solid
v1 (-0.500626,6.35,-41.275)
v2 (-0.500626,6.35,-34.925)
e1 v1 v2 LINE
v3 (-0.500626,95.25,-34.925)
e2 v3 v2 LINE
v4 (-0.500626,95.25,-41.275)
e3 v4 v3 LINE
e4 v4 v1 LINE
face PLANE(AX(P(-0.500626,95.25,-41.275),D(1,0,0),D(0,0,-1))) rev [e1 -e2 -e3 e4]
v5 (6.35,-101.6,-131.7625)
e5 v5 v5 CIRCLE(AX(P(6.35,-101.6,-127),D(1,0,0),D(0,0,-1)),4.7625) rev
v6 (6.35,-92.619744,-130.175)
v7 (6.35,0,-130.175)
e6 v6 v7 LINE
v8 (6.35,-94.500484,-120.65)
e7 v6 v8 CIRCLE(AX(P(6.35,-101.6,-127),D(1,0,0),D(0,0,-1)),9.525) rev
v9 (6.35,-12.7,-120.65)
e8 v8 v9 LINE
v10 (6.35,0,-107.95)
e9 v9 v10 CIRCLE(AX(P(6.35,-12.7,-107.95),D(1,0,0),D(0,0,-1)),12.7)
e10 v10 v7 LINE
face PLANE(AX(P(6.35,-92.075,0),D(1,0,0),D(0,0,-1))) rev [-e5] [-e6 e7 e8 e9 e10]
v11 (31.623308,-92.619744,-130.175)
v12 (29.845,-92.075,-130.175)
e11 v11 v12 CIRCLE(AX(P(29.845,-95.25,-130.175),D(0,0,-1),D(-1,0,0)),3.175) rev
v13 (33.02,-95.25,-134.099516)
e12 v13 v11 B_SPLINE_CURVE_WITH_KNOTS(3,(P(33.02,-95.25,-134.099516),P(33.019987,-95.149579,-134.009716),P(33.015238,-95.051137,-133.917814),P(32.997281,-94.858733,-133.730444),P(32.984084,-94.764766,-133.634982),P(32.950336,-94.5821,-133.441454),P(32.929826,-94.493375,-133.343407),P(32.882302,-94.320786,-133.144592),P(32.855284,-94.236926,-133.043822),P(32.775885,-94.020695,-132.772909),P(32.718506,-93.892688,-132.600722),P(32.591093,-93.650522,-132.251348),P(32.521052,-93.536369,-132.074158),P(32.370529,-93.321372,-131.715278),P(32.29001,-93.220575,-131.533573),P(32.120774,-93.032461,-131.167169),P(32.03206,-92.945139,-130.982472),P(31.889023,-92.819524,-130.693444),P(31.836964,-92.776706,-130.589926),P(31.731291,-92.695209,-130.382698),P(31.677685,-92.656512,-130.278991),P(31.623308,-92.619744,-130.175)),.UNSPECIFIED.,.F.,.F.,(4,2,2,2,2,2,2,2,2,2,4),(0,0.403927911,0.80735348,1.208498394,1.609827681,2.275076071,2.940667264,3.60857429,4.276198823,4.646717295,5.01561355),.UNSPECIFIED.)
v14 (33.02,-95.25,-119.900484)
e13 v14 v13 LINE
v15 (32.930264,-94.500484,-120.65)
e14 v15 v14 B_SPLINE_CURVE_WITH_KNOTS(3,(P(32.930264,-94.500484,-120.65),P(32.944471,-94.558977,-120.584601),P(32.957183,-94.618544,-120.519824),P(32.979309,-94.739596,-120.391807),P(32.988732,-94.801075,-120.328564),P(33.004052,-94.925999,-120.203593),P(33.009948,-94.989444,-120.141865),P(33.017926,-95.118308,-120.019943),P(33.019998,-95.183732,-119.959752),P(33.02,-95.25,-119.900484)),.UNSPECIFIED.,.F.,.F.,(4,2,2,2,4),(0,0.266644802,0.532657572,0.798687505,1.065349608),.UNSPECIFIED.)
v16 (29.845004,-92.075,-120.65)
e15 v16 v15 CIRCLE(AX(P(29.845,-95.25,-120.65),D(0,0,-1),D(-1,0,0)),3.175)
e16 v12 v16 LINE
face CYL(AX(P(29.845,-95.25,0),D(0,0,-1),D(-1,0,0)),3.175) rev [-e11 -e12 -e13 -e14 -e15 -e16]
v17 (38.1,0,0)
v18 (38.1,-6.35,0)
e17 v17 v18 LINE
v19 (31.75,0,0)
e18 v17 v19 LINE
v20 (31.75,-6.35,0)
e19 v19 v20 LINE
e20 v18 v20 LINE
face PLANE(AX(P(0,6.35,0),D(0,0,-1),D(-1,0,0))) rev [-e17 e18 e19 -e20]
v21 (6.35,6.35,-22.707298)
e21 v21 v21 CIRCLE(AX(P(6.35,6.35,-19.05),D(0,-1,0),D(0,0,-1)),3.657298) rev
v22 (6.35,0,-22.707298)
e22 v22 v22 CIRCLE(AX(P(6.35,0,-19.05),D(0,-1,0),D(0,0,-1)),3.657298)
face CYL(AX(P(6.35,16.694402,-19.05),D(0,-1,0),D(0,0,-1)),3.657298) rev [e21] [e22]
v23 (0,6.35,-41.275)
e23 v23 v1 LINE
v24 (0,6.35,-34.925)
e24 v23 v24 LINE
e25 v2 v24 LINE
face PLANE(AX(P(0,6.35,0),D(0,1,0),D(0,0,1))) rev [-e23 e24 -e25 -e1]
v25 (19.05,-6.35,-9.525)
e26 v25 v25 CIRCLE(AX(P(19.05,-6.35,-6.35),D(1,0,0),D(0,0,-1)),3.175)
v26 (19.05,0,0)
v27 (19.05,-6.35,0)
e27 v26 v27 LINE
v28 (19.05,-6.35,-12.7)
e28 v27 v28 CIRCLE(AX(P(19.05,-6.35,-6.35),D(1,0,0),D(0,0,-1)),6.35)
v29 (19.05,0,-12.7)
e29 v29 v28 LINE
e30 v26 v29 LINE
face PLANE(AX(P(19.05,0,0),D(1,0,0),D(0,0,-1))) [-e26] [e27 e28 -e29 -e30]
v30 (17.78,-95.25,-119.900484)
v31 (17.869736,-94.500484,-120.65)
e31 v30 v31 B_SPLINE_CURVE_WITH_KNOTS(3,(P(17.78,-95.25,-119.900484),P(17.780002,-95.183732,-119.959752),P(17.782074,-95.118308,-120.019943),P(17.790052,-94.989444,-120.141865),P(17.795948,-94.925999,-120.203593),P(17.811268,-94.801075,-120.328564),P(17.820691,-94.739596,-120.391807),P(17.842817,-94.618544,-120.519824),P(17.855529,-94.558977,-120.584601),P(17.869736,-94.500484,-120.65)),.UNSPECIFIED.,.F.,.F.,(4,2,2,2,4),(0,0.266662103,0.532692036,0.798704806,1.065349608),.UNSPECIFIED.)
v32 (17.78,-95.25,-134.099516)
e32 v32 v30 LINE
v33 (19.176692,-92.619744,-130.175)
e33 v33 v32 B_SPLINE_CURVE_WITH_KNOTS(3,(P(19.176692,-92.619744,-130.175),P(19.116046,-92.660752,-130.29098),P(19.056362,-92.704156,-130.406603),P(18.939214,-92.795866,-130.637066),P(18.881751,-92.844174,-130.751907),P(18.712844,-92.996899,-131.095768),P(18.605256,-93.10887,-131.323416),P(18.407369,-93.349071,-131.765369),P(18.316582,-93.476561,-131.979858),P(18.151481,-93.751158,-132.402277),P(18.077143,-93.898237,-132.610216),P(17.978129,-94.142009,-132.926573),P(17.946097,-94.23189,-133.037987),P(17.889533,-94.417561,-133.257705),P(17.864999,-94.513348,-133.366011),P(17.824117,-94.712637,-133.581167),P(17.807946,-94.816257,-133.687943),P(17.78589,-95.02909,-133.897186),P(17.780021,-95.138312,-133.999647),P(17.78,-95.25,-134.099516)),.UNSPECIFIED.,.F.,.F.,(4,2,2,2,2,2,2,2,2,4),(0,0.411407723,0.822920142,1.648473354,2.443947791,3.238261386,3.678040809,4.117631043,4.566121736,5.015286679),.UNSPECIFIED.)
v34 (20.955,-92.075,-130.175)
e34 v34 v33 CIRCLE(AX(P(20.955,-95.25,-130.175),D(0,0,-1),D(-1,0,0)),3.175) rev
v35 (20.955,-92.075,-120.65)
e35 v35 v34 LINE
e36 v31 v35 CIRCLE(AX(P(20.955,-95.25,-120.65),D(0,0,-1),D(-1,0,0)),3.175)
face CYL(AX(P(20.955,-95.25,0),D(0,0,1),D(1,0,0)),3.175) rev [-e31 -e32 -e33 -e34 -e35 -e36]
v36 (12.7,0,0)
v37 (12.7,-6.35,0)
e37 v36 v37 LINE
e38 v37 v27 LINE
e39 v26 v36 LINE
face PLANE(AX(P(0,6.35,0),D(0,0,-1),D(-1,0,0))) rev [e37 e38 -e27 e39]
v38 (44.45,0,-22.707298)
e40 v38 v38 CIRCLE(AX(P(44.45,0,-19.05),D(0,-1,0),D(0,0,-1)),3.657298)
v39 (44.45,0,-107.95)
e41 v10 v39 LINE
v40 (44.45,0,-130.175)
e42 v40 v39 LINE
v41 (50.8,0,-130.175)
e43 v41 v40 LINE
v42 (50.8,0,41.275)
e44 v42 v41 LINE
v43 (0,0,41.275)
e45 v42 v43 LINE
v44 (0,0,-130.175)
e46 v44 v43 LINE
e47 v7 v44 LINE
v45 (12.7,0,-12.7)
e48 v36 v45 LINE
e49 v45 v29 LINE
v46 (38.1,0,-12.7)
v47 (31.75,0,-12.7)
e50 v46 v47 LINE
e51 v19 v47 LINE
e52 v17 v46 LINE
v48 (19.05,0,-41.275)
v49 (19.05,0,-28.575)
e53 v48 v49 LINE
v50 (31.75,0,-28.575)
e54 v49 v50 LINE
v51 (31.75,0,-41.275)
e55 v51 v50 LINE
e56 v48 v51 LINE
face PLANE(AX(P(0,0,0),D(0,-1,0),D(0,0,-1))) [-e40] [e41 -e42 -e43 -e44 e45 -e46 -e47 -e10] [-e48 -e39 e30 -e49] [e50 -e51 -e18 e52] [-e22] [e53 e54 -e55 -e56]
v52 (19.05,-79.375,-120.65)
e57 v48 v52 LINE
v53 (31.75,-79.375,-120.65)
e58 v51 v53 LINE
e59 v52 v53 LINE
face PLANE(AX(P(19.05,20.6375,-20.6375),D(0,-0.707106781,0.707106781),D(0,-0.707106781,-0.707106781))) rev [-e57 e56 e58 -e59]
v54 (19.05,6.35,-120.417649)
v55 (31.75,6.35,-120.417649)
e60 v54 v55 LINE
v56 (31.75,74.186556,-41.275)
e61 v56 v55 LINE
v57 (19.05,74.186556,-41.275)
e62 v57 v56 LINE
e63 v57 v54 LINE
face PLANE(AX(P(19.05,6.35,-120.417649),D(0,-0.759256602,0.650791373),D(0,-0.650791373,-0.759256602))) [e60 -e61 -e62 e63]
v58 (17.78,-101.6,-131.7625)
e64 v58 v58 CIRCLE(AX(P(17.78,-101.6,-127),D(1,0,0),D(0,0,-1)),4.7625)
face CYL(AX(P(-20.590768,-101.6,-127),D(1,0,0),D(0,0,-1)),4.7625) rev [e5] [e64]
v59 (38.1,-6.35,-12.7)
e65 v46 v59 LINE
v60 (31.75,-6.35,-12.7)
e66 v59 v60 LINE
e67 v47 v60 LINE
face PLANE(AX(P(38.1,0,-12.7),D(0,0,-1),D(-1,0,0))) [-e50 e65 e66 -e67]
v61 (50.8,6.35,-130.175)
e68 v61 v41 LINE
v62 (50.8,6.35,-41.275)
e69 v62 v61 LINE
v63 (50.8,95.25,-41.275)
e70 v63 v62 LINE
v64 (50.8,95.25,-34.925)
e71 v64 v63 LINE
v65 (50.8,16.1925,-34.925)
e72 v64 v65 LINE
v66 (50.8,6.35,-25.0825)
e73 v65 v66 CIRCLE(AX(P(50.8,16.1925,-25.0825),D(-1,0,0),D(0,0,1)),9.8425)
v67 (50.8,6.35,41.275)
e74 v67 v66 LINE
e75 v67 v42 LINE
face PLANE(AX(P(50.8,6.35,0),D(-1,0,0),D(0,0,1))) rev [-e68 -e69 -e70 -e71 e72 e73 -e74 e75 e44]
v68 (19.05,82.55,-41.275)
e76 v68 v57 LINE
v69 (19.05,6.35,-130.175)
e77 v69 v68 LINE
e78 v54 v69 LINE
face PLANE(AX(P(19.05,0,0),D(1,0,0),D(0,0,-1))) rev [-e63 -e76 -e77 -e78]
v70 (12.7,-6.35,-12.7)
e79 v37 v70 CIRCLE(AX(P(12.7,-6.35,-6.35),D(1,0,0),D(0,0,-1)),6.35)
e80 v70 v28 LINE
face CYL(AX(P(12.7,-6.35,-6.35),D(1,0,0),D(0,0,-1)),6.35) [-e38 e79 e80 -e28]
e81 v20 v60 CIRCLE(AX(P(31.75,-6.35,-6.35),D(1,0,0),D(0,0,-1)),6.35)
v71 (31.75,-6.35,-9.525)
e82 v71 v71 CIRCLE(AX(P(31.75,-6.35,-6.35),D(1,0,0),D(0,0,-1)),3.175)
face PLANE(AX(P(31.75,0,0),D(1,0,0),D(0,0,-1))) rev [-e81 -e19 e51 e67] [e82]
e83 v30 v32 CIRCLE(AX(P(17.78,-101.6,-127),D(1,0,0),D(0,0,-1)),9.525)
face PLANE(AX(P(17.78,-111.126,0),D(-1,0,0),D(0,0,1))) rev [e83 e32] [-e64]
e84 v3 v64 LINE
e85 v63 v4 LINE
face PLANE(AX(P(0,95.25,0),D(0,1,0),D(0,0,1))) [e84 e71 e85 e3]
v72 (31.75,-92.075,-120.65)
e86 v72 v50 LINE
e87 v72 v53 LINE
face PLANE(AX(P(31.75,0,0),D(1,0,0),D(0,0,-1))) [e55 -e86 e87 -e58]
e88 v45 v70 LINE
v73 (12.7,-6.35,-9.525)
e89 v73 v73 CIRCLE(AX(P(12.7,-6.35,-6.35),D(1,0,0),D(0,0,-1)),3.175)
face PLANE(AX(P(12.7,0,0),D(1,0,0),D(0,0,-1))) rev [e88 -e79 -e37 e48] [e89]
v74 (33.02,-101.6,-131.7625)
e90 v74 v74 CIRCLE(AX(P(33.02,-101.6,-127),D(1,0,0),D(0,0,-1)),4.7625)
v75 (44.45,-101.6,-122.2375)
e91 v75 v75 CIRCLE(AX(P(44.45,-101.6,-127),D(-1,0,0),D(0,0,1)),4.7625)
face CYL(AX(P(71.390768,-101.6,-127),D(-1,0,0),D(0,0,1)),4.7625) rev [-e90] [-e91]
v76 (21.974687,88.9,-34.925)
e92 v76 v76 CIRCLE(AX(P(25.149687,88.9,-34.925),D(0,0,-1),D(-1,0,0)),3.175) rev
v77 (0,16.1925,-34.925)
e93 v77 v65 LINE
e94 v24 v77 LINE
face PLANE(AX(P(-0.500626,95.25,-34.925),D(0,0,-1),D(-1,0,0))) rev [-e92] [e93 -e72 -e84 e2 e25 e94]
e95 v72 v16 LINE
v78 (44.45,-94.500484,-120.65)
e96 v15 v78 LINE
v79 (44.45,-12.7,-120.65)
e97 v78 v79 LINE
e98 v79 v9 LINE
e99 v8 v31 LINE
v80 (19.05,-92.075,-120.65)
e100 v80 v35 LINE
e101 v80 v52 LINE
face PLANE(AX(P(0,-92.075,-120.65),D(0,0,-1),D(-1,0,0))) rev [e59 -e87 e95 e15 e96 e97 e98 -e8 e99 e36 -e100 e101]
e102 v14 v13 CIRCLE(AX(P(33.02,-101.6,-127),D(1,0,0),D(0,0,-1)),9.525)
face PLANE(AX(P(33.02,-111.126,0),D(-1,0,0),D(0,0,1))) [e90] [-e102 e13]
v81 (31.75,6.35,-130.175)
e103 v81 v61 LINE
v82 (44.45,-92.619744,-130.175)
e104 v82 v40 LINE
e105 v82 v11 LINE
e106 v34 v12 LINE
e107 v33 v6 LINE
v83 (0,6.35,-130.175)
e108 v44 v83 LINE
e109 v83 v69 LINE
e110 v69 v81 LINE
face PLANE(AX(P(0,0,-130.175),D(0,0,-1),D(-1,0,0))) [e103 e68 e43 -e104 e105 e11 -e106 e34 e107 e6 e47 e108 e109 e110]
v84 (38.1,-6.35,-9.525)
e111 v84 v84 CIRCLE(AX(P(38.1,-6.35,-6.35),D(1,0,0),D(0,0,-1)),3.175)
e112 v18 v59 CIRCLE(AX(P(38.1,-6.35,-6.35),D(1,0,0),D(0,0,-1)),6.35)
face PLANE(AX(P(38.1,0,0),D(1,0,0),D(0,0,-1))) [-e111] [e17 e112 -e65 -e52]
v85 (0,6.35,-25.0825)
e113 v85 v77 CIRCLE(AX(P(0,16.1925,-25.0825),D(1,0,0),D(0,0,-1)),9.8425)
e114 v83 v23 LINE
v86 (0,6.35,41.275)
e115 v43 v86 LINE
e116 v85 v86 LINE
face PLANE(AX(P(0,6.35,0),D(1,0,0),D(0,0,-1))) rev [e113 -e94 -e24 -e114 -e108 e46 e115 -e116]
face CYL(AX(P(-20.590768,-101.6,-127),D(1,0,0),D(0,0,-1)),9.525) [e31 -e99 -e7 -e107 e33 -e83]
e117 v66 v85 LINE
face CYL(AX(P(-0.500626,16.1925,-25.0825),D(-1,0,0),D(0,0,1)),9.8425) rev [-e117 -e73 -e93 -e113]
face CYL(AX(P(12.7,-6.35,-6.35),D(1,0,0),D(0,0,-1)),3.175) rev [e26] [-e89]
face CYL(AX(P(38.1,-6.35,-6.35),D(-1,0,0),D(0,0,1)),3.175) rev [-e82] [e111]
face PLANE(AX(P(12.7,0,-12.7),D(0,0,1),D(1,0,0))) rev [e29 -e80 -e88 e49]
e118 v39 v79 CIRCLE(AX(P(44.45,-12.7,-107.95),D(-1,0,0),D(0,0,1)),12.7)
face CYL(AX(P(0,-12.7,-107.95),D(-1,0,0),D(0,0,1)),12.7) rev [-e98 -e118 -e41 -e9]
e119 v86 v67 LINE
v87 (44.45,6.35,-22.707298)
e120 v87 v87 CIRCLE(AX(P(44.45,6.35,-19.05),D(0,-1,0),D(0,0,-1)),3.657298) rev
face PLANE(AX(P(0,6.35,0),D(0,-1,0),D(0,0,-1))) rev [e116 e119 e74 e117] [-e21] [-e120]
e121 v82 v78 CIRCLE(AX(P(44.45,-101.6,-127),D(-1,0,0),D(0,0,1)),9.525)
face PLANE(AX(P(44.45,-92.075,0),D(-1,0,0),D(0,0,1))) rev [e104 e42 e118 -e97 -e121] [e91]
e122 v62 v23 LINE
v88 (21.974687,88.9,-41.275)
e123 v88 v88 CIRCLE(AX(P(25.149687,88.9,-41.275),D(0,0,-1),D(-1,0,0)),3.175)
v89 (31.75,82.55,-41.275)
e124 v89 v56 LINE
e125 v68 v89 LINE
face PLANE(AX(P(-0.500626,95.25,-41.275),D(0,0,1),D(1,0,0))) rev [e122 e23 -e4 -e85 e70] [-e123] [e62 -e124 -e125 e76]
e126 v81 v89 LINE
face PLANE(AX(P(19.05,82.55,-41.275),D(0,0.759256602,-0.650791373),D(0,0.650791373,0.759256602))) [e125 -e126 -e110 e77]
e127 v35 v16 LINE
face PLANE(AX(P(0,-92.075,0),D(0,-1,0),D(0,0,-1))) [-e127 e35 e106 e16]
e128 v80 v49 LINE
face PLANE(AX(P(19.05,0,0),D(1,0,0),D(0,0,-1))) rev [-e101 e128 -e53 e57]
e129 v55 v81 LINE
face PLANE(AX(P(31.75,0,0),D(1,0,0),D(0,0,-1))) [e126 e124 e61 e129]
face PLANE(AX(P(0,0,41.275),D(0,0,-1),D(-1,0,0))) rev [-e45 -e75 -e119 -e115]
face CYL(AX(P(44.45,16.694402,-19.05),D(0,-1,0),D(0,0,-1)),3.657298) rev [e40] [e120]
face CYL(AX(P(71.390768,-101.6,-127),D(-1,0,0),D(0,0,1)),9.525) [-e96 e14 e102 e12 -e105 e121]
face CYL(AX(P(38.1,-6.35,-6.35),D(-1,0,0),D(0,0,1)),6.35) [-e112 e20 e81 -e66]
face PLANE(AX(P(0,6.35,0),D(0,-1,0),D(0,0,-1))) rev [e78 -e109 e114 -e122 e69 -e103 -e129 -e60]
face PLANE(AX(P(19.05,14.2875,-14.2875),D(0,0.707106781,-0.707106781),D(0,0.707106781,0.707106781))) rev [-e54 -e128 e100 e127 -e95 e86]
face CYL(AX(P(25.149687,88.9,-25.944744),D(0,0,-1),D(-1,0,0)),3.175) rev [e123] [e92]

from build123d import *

# Parameters (mm, degrees)
SKETCH2_W                 = 50.8
SKETCH2_H                 = 92.075
BOSS_EXTRUDE1_DEPTH       = 6.35
SKETCH3_W                 = 51.30062604
SKETCH3_H                 = 6.35
BOSS_EXTRUDE2_DEPTH       = 88.9
FILLET1_R                 = 9.8425
SKETCH4_W                 = 50.8
SKETCH4_H                 = 6.35
BOSS_EXTRUDE3_DEPTH       = 38.1
SKETCH7_W                 = 19.05
SKETCH7_H                 = 9.525
BOSS_EXTRUDE4_DEPTH       = 92.075
BOSS_EXTRUDE7_START       = -7.62
SKETCH5_R                 = 9.525
SKETCH5_R_2               = 4.7625
BOSS_EXTRUDE7_DEPTH       = 11.43
BOSS_EXTRUDE8_START       = 7.62
BOSS_EXTRUDE8_DEPTH       = 11.43
SKETCH11_W                = 11.43
SKETCH11_H                = 9.525
BOSS_EXTRUDE9_DEPTH       = 2.425484171
BOSS_EXTRUDE10_DEPTH      = 6.35
BOSS_EXTRUDE10_DEPTH_BACK = 6.35
BOSS_EXTRUDE11_START      = 6.35
BOSS_EXTRUDE11_DEPTH      = 6.35
BOSS_EXTRUDE12_START      = -12.7
BOSS_EXTRUDE12_DEPTH      = 6.35
BOSS_EXTRUDE13_START      = -34.925
SKETCH18_W                = 50.8
SKETCH18_H                = 6.35
BOSS_EXTRUDE13_DEPTH      = 76.2
SKETCH17_R                = 3.657298314
CUT_EXTRUDE4_DEPTH        = 6.35
CUT_EXTRUDE5_DEPTH        = 6.35
BOSS_EXTRUDE14_DEPTH      = 6.35
BOSS_EXTRUDE14_DEPTH_BACK = 6.35
FILLET2_R                 = 12.7
FILLET3_R                 = 3.175


with BuildPart() as part:
    # Sketch2 → Boss-Extrude1 (new body)
    with BuildSketch(Plane(origin=(0, 0, 0), x_dir=(1, 0, 0), z_dir=(0, 1, 0))):
        with Locations((25.4, 46.0375)):
            Rectangle(SKETCH2_W, SKETCH2_H)
    extrude(amount=BOSS_EXTRUDE1_DEPTH)

    # Sketch3 → Boss-Extrude2 (add)
    with BuildSketch(Plane(origin=(0, 6.35, 0), x_dir=(1, 0, 0), z_dir=(0, 1, 0))):
        with Locations((25.14968698, 38.1)):
            Rectangle(SKETCH3_W, SKETCH3_H)
    extrude(amount=BOSS_EXTRUDE2_DEPTH)

    # Fillet1
    fillet1_edges = [part.edges().sort_by_distance(p)[0] for p in [
        (25.4, 6.35, -34.925),
    ]]
    fillet(fillet1_edges, radius=FILLET1_R)

    # Sketch4 → Boss-Extrude3 (add)
    with BuildSketch(Plane(origin=(0, 0, -92.075), x_dir=(-1, 0, 0), z_dir=(0, 0, -1))):
        with Locations((-25.4, 3.175)):
            Rectangle(SKETCH4_W, SKETCH4_H)
    extrude(amount=BOSS_EXTRUDE3_DEPTH)

    # Sketch7 → Boss-Extrude4 (add)
    with BuildSketch(Plane(origin=(0, 0, 0), x_dir=(-1, 0, 0), z_dir=(0, -1, 0))):
        with Locations((-15.875, 125.4125)):
            Rectangle(SKETCH7_W, SKETCH7_H)
        with Locations((-34.925, 125.4125)):
            Rectangle(SKETCH7_W, SKETCH7_H)
    extrude(amount=BOSS_EXTRUDE4_DEPTH)



with BuildPart() as body_2:
    # Sketch5 → Boss-Extrude7 (new body)
    with BuildSketch(Plane(origin=(25.4, 0, 0), x_dir=(0, 0, -1), z_dir=(1, 0, 0)).offset(BOSS_EXTRUDE7_START)):
        with Locations((127, -101.6)):
            Circle(SKETCH5_R)
        with Locations((127, -101.6)):
            Circle(SKETCH5_R_2, mode=Mode.SUBTRACT)
    extrude(amount=-BOSS_EXTRUDE7_DEPTH)


with BuildPart() as body_3:
    # Sketch5<6> → Boss-Extrude8 (new body)
    with BuildSketch(Plane(origin=(25.4, 0, 0), x_dir=(0, 0, -1), z_dir=(1, 0, 0)).offset(BOSS_EXTRUDE8_START)):
        with BuildLine():
            ThreePointArc((127, -92.075), (120.264807909, -94.864807909), (117.475, -101.6))
            Line((117.475, -101.6), (122.2375, -101.6))
            ThreePointArc((122.2375, -101.6), (123.632403955, -98.232403955), (127, -96.8375))
            Line((127, -96.8375), (127, -92.075))
        make_face()
        with BuildLine():
            Line((122.2375, -101.6), (117.475, -101.6))
            ThreePointArc((117.475, -101.6), (127, -111.125), (136.525, -101.6))
            ThreePointArc((136.525, -101.6), (133.735192091, -94.864807909), (127, -92.075))
            Line((127, -92.075), (127, -96.8375))
            ThreePointArc((127, -96.8375), (130.367596045, -98.232403955), (131.7625, -101.6))
            ThreePointArc((131.7625, -101.6), (127, -106.3625), (122.2375, -101.6))
        make_face()
    extrude(amount=BOSS_EXTRUDE8_DEPTH)


with BuildPart() as part_1:
    add(part.part)

    add(body_2.part)  # Boss-Extrude9 merges body 2

    add(body_3.part)  # Boss-Extrude9 merges body 3
    # Sketch11 → Boss-Extrude9 (add)
    with BuildSketch(Plane.XZ.offset(92.075)):
        with Locations((12.065, -125.4125)):
            Rectangle(SKETCH11_W, SKETCH11_H)
        with Locations((38.735, -125.4125)):
            Rectangle(SKETCH11_W, SKETCH11_H)
    extrude(amount=BOSS_EXTRUDE9_DEPTH)

    # Sketch13 → Boss-Extrude10 (add, two sides: drawn at the far end of the back side and taken through both)
    with BuildSketch(Plane(origin=(25.4, 0, 0), x_dir=(0, 0, -1), z_dir=(1, 0, 0)).offset(-BOSS_EXTRUDE10_DEPTH_BACK)):
        Polygon((120.65, -79.375), (41.275, 0), (28.575, 0), (120.65, -92.075), align=None)
    extrude(amount=BOSS_EXTRUDE10_DEPTH + BOSS_EXTRUDE10_DEPTH_BACK)

    # Sketch15 → Boss-Extrude11 (add)
    with BuildSketch(Plane(origin=(25.4, 0, 0), x_dir=(0, 0, -1), z_dir=(1, 0, 0)).offset(BOSS_EXTRUDE11_START)):
        with BuildLine():
            ThreePointArc((12.7, -6.35), (10.840128061, -1.859871939), (6.35, 0))
            ThreePointArc((6.35, 0), (1.859871939, -1.859871939), (0, -6.35))
            Line((0, -6.35), (3.175, -6.35))
            ThreePointArc((3.175, -6.35), (6.35, -3.175), (9.525, -6.35))
            Line((9.525, -6.35), (12.7, -6.35))
        make_face()
        with BuildLine():
            Line((3.175, -6.35), (0, -6.35))
            ThreePointArc((0, -6.35), (6.35, -12.7), (12.7, -6.35))
            Line((12.7, -6.35), (9.525, -6.35))
            ThreePointArc((9.525, -6.35), (6.35, -9.525), (3.175, -6.35))
        make_face()
        with BuildLine():
            Line((6.35, 0), (0, 0))
            Line((0, 0), (0, -6.35))
            ThreePointArc((0, -6.35), (1.859871939, -1.859871939), (6.35, 0))
        make_face()
        with BuildLine():
            Line((12.7, 0), (6.35, 0))
            ThreePointArc((6.35, 0), (10.840128061, -1.859871939), (12.7, -6.35))
            Line((12.7, -6.35), (12.7, 0))
        make_face()
    extrude(amount=BOSS_EXTRUDE11_DEPTH)

    # Sketch15<3> → Boss-Extrude12 (add)
    with BuildSketch(Plane(origin=(25.4, 0, 0), x_dir=(0, 0, -1), z_dir=(1, 0, 0)).offset(BOSS_EXTRUDE12_START)):
        with BuildLine():
            ThreePointArc((12.7, -6.35), (10.840128061, -1.859871939), (6.35, 0))
            ThreePointArc((6.35, 0), (1.859871939, -1.859871939), (0, -6.35))
            Line((0, -6.35), (3.175, -6.35))
            ThreePointArc((3.175, -6.35), (6.35, -3.175), (9.525, -6.35))
            Line((9.525, -6.35), (12.7, -6.35))
        make_face()
        with BuildLine():
            Line((3.175, -6.35), (0, -6.35))
            ThreePointArc((0, -6.35), (6.35, -12.7), (12.7, -6.35))
            Line((12.7, -6.35), (9.525, -6.35))
            ThreePointArc((9.525, -6.35), (6.35, -9.525), (3.175, -6.35))
        make_face()
        with BuildLine():
            Line((6.35, 0), (0, 0))
            Line((0, 0), (0, -6.35))
            ThreePointArc((0, -6.35), (1.859871939, -1.859871939), (6.35, 0))
        make_face()
        with BuildLine():
            Line((12.7, 0), (6.35, 0))
            ThreePointArc((6.35, 0), (10.840128061, -1.859871939), (12.7, -6.35))
            Line((12.7, -6.35), (12.7, 0))
        make_face()
    extrude(amount=BOSS_EXTRUDE12_DEPTH)

    # Sketch18 → Boss-Extrude13 (add)
    with BuildSketch(Plane.XY.offset(BOSS_EXTRUDE13_START)):
        with Locations((25.4, 3.175)):
            Rectangle(SKETCH18_W, SKETCH18_H)
    extrude(amount=BOSS_EXTRUDE13_DEPTH)

    # Sketch17 → Cut-Extrude4 (cut)
    with BuildSketch(Plane(origin=(0, 0, 0), x_dir=(-1, 0, 0), z_dir=(0, -1, 0))):
        with Locations(Location((-44.45, 19.05, 0), (0, 0, 90))):
            Circle(SKETCH17_R)
        with Locations(Location((-6.35, 19.05, 0), (0, 0, 90))):
            Circle(SKETCH17_R)
    extrude(amount=-CUT_EXTRUDE4_DEPTH, mode=Mode.SUBTRACT)

    # Sketch19 → Cut-Extrude5 (cut)
    with BuildSketch(Plane(origin=(0, 0, -41.275), x_dir=(-1, 0, 0), z_dir=(0, 0, -1))):
        with BuildLine():
            ThreePointArc((-28.32468698, 88.9), (-25.14968698, 85.725), (-21.97468698, 88.9))
            Line((-21.97468698, 88.9), (-28.32468698, 88.9))
        make_face()
        with BuildLine():
            Line((-28.32468698, 88.9), (-21.97468698, 88.9))
            ThreePointArc((-21.97468698, 88.9), (-25.14968698, 92.075), (-28.32468698, 88.9))
        make_face()
    extrude(amount=-CUT_EXTRUDE5_DEPTH, mode=Mode.SUBTRACT)

    # Sketch20 → Boss-Extrude14 (add, two sides: drawn at the far end of the back side and taken through both)
    with BuildSketch(Plane(origin=(25.4, 0, 0), x_dir=(0, 0, -1), z_dir=(1, 0, 0)).offset(-BOSS_EXTRUDE14_DEPTH_BACK)):
        Polygon((41.275, 82.55), (130.175, 6.35), (120.417648783, 6.35), (41.275, 74.186556099), align=None)
    extrude(amount=BOSS_EXTRUDE14_DEPTH + BOSS_EXTRUDE14_DEPTH_BACK)

    # Fillet2
    fillet2_edges = [part_1.edges().sort_by_distance(p)[0] for p in [
        (25.4, 0, -120.65),
    ]]
    fillet(fillet2_edges, radius=FILLET2_R)

    # Fillet3
    # the kernel refuses this fillet: 3.175 mm, written as the material it adds along each edge
    with BuildSketch(Plane(origin=(33.02, -92.075, -120.65), x_dir=(-1, 0, 0), z_dir=(0, 0, -1))) as fillet3_piece_1:
        with BuildLine():
            CenterArc((FILLET3_R, -FILLET3_R), FILLET3_R, 90, 90)
            Line((0, -FILLET3_R), (0, 0))
            Line((0, 0), (FILLET3_R, 0))
        make_face()
    extrude(amount=9.525)
    with BuildSketch(Plane(origin=(33.02, -92.075, -112.7125), x_dir=(-1, 0, 0), z_dir=(0, 0, -1))) as fillet3_piece_2_section:
        with BuildLine():
            CenterArc((FILLET3_R, -FILLET3_R), FILLET3_R, 90, 90)
            Line((0, -FILLET3_R), (0, 0))
            Line((0, 0), (FILLET3_R, 0))
        make_face()
    fillet3_piece_2 = extrude(amount=25.4, mode=Mode.PRIVATE)
    fillet3_piece_2 = fillet3_piece_2 & Plane(origin=(33.001906898, -101.6, -127), x_dir=(0, 1, 0), z_dir=(-1, 0, 0)) * Cylinder(9.525, 64, mode=Mode.PRIVATE)
    add(fillet3_piece_2)
    with BuildSketch(Plane(origin=(17.78, -92.075, -120.65), x_dir=(1, 0, 0), z_dir=(0, 0, -1))) as fillet3_piece_3:
        with BuildLine():
            CenterArc((FILLET3_R, FILLET3_R), FILLET3_R, 180, 90)
            Line((0, FILLET3_R), (0, 0))
            Line((0, 0), (FILLET3_R, 0))
        make_face()
    extrude(amount=9.525)
    with BuildSketch(Plane(origin=(17.78, -92.075, -112.7125), x_dir=(1, 0, 0), z_dir=(0, 0, -1))) as fillet3_piece_4_section:
        with BuildLine():
            CenterArc((FILLET3_R, FILLET3_R), FILLET3_R, 180, 90)
            Line((0, FILLET3_R), (0, 0))
            Line((0, 0), (FILLET3_R, 0))
        make_face()
    fillet3_piece_4 = extrude(amount=25.4, mode=Mode.PRIVATE)
    fillet3_piece_4 = fillet3_piece_4 & Plane(origin=(17.798093102, -101.6, -127), x_dir=(0, 0, -1), z_dir=(1, 0, 0)) * Cylinder(9.525, 64, mode=Mode.PRIVATE)
    add(fillet3_piece_4)


solid = part_1.part
